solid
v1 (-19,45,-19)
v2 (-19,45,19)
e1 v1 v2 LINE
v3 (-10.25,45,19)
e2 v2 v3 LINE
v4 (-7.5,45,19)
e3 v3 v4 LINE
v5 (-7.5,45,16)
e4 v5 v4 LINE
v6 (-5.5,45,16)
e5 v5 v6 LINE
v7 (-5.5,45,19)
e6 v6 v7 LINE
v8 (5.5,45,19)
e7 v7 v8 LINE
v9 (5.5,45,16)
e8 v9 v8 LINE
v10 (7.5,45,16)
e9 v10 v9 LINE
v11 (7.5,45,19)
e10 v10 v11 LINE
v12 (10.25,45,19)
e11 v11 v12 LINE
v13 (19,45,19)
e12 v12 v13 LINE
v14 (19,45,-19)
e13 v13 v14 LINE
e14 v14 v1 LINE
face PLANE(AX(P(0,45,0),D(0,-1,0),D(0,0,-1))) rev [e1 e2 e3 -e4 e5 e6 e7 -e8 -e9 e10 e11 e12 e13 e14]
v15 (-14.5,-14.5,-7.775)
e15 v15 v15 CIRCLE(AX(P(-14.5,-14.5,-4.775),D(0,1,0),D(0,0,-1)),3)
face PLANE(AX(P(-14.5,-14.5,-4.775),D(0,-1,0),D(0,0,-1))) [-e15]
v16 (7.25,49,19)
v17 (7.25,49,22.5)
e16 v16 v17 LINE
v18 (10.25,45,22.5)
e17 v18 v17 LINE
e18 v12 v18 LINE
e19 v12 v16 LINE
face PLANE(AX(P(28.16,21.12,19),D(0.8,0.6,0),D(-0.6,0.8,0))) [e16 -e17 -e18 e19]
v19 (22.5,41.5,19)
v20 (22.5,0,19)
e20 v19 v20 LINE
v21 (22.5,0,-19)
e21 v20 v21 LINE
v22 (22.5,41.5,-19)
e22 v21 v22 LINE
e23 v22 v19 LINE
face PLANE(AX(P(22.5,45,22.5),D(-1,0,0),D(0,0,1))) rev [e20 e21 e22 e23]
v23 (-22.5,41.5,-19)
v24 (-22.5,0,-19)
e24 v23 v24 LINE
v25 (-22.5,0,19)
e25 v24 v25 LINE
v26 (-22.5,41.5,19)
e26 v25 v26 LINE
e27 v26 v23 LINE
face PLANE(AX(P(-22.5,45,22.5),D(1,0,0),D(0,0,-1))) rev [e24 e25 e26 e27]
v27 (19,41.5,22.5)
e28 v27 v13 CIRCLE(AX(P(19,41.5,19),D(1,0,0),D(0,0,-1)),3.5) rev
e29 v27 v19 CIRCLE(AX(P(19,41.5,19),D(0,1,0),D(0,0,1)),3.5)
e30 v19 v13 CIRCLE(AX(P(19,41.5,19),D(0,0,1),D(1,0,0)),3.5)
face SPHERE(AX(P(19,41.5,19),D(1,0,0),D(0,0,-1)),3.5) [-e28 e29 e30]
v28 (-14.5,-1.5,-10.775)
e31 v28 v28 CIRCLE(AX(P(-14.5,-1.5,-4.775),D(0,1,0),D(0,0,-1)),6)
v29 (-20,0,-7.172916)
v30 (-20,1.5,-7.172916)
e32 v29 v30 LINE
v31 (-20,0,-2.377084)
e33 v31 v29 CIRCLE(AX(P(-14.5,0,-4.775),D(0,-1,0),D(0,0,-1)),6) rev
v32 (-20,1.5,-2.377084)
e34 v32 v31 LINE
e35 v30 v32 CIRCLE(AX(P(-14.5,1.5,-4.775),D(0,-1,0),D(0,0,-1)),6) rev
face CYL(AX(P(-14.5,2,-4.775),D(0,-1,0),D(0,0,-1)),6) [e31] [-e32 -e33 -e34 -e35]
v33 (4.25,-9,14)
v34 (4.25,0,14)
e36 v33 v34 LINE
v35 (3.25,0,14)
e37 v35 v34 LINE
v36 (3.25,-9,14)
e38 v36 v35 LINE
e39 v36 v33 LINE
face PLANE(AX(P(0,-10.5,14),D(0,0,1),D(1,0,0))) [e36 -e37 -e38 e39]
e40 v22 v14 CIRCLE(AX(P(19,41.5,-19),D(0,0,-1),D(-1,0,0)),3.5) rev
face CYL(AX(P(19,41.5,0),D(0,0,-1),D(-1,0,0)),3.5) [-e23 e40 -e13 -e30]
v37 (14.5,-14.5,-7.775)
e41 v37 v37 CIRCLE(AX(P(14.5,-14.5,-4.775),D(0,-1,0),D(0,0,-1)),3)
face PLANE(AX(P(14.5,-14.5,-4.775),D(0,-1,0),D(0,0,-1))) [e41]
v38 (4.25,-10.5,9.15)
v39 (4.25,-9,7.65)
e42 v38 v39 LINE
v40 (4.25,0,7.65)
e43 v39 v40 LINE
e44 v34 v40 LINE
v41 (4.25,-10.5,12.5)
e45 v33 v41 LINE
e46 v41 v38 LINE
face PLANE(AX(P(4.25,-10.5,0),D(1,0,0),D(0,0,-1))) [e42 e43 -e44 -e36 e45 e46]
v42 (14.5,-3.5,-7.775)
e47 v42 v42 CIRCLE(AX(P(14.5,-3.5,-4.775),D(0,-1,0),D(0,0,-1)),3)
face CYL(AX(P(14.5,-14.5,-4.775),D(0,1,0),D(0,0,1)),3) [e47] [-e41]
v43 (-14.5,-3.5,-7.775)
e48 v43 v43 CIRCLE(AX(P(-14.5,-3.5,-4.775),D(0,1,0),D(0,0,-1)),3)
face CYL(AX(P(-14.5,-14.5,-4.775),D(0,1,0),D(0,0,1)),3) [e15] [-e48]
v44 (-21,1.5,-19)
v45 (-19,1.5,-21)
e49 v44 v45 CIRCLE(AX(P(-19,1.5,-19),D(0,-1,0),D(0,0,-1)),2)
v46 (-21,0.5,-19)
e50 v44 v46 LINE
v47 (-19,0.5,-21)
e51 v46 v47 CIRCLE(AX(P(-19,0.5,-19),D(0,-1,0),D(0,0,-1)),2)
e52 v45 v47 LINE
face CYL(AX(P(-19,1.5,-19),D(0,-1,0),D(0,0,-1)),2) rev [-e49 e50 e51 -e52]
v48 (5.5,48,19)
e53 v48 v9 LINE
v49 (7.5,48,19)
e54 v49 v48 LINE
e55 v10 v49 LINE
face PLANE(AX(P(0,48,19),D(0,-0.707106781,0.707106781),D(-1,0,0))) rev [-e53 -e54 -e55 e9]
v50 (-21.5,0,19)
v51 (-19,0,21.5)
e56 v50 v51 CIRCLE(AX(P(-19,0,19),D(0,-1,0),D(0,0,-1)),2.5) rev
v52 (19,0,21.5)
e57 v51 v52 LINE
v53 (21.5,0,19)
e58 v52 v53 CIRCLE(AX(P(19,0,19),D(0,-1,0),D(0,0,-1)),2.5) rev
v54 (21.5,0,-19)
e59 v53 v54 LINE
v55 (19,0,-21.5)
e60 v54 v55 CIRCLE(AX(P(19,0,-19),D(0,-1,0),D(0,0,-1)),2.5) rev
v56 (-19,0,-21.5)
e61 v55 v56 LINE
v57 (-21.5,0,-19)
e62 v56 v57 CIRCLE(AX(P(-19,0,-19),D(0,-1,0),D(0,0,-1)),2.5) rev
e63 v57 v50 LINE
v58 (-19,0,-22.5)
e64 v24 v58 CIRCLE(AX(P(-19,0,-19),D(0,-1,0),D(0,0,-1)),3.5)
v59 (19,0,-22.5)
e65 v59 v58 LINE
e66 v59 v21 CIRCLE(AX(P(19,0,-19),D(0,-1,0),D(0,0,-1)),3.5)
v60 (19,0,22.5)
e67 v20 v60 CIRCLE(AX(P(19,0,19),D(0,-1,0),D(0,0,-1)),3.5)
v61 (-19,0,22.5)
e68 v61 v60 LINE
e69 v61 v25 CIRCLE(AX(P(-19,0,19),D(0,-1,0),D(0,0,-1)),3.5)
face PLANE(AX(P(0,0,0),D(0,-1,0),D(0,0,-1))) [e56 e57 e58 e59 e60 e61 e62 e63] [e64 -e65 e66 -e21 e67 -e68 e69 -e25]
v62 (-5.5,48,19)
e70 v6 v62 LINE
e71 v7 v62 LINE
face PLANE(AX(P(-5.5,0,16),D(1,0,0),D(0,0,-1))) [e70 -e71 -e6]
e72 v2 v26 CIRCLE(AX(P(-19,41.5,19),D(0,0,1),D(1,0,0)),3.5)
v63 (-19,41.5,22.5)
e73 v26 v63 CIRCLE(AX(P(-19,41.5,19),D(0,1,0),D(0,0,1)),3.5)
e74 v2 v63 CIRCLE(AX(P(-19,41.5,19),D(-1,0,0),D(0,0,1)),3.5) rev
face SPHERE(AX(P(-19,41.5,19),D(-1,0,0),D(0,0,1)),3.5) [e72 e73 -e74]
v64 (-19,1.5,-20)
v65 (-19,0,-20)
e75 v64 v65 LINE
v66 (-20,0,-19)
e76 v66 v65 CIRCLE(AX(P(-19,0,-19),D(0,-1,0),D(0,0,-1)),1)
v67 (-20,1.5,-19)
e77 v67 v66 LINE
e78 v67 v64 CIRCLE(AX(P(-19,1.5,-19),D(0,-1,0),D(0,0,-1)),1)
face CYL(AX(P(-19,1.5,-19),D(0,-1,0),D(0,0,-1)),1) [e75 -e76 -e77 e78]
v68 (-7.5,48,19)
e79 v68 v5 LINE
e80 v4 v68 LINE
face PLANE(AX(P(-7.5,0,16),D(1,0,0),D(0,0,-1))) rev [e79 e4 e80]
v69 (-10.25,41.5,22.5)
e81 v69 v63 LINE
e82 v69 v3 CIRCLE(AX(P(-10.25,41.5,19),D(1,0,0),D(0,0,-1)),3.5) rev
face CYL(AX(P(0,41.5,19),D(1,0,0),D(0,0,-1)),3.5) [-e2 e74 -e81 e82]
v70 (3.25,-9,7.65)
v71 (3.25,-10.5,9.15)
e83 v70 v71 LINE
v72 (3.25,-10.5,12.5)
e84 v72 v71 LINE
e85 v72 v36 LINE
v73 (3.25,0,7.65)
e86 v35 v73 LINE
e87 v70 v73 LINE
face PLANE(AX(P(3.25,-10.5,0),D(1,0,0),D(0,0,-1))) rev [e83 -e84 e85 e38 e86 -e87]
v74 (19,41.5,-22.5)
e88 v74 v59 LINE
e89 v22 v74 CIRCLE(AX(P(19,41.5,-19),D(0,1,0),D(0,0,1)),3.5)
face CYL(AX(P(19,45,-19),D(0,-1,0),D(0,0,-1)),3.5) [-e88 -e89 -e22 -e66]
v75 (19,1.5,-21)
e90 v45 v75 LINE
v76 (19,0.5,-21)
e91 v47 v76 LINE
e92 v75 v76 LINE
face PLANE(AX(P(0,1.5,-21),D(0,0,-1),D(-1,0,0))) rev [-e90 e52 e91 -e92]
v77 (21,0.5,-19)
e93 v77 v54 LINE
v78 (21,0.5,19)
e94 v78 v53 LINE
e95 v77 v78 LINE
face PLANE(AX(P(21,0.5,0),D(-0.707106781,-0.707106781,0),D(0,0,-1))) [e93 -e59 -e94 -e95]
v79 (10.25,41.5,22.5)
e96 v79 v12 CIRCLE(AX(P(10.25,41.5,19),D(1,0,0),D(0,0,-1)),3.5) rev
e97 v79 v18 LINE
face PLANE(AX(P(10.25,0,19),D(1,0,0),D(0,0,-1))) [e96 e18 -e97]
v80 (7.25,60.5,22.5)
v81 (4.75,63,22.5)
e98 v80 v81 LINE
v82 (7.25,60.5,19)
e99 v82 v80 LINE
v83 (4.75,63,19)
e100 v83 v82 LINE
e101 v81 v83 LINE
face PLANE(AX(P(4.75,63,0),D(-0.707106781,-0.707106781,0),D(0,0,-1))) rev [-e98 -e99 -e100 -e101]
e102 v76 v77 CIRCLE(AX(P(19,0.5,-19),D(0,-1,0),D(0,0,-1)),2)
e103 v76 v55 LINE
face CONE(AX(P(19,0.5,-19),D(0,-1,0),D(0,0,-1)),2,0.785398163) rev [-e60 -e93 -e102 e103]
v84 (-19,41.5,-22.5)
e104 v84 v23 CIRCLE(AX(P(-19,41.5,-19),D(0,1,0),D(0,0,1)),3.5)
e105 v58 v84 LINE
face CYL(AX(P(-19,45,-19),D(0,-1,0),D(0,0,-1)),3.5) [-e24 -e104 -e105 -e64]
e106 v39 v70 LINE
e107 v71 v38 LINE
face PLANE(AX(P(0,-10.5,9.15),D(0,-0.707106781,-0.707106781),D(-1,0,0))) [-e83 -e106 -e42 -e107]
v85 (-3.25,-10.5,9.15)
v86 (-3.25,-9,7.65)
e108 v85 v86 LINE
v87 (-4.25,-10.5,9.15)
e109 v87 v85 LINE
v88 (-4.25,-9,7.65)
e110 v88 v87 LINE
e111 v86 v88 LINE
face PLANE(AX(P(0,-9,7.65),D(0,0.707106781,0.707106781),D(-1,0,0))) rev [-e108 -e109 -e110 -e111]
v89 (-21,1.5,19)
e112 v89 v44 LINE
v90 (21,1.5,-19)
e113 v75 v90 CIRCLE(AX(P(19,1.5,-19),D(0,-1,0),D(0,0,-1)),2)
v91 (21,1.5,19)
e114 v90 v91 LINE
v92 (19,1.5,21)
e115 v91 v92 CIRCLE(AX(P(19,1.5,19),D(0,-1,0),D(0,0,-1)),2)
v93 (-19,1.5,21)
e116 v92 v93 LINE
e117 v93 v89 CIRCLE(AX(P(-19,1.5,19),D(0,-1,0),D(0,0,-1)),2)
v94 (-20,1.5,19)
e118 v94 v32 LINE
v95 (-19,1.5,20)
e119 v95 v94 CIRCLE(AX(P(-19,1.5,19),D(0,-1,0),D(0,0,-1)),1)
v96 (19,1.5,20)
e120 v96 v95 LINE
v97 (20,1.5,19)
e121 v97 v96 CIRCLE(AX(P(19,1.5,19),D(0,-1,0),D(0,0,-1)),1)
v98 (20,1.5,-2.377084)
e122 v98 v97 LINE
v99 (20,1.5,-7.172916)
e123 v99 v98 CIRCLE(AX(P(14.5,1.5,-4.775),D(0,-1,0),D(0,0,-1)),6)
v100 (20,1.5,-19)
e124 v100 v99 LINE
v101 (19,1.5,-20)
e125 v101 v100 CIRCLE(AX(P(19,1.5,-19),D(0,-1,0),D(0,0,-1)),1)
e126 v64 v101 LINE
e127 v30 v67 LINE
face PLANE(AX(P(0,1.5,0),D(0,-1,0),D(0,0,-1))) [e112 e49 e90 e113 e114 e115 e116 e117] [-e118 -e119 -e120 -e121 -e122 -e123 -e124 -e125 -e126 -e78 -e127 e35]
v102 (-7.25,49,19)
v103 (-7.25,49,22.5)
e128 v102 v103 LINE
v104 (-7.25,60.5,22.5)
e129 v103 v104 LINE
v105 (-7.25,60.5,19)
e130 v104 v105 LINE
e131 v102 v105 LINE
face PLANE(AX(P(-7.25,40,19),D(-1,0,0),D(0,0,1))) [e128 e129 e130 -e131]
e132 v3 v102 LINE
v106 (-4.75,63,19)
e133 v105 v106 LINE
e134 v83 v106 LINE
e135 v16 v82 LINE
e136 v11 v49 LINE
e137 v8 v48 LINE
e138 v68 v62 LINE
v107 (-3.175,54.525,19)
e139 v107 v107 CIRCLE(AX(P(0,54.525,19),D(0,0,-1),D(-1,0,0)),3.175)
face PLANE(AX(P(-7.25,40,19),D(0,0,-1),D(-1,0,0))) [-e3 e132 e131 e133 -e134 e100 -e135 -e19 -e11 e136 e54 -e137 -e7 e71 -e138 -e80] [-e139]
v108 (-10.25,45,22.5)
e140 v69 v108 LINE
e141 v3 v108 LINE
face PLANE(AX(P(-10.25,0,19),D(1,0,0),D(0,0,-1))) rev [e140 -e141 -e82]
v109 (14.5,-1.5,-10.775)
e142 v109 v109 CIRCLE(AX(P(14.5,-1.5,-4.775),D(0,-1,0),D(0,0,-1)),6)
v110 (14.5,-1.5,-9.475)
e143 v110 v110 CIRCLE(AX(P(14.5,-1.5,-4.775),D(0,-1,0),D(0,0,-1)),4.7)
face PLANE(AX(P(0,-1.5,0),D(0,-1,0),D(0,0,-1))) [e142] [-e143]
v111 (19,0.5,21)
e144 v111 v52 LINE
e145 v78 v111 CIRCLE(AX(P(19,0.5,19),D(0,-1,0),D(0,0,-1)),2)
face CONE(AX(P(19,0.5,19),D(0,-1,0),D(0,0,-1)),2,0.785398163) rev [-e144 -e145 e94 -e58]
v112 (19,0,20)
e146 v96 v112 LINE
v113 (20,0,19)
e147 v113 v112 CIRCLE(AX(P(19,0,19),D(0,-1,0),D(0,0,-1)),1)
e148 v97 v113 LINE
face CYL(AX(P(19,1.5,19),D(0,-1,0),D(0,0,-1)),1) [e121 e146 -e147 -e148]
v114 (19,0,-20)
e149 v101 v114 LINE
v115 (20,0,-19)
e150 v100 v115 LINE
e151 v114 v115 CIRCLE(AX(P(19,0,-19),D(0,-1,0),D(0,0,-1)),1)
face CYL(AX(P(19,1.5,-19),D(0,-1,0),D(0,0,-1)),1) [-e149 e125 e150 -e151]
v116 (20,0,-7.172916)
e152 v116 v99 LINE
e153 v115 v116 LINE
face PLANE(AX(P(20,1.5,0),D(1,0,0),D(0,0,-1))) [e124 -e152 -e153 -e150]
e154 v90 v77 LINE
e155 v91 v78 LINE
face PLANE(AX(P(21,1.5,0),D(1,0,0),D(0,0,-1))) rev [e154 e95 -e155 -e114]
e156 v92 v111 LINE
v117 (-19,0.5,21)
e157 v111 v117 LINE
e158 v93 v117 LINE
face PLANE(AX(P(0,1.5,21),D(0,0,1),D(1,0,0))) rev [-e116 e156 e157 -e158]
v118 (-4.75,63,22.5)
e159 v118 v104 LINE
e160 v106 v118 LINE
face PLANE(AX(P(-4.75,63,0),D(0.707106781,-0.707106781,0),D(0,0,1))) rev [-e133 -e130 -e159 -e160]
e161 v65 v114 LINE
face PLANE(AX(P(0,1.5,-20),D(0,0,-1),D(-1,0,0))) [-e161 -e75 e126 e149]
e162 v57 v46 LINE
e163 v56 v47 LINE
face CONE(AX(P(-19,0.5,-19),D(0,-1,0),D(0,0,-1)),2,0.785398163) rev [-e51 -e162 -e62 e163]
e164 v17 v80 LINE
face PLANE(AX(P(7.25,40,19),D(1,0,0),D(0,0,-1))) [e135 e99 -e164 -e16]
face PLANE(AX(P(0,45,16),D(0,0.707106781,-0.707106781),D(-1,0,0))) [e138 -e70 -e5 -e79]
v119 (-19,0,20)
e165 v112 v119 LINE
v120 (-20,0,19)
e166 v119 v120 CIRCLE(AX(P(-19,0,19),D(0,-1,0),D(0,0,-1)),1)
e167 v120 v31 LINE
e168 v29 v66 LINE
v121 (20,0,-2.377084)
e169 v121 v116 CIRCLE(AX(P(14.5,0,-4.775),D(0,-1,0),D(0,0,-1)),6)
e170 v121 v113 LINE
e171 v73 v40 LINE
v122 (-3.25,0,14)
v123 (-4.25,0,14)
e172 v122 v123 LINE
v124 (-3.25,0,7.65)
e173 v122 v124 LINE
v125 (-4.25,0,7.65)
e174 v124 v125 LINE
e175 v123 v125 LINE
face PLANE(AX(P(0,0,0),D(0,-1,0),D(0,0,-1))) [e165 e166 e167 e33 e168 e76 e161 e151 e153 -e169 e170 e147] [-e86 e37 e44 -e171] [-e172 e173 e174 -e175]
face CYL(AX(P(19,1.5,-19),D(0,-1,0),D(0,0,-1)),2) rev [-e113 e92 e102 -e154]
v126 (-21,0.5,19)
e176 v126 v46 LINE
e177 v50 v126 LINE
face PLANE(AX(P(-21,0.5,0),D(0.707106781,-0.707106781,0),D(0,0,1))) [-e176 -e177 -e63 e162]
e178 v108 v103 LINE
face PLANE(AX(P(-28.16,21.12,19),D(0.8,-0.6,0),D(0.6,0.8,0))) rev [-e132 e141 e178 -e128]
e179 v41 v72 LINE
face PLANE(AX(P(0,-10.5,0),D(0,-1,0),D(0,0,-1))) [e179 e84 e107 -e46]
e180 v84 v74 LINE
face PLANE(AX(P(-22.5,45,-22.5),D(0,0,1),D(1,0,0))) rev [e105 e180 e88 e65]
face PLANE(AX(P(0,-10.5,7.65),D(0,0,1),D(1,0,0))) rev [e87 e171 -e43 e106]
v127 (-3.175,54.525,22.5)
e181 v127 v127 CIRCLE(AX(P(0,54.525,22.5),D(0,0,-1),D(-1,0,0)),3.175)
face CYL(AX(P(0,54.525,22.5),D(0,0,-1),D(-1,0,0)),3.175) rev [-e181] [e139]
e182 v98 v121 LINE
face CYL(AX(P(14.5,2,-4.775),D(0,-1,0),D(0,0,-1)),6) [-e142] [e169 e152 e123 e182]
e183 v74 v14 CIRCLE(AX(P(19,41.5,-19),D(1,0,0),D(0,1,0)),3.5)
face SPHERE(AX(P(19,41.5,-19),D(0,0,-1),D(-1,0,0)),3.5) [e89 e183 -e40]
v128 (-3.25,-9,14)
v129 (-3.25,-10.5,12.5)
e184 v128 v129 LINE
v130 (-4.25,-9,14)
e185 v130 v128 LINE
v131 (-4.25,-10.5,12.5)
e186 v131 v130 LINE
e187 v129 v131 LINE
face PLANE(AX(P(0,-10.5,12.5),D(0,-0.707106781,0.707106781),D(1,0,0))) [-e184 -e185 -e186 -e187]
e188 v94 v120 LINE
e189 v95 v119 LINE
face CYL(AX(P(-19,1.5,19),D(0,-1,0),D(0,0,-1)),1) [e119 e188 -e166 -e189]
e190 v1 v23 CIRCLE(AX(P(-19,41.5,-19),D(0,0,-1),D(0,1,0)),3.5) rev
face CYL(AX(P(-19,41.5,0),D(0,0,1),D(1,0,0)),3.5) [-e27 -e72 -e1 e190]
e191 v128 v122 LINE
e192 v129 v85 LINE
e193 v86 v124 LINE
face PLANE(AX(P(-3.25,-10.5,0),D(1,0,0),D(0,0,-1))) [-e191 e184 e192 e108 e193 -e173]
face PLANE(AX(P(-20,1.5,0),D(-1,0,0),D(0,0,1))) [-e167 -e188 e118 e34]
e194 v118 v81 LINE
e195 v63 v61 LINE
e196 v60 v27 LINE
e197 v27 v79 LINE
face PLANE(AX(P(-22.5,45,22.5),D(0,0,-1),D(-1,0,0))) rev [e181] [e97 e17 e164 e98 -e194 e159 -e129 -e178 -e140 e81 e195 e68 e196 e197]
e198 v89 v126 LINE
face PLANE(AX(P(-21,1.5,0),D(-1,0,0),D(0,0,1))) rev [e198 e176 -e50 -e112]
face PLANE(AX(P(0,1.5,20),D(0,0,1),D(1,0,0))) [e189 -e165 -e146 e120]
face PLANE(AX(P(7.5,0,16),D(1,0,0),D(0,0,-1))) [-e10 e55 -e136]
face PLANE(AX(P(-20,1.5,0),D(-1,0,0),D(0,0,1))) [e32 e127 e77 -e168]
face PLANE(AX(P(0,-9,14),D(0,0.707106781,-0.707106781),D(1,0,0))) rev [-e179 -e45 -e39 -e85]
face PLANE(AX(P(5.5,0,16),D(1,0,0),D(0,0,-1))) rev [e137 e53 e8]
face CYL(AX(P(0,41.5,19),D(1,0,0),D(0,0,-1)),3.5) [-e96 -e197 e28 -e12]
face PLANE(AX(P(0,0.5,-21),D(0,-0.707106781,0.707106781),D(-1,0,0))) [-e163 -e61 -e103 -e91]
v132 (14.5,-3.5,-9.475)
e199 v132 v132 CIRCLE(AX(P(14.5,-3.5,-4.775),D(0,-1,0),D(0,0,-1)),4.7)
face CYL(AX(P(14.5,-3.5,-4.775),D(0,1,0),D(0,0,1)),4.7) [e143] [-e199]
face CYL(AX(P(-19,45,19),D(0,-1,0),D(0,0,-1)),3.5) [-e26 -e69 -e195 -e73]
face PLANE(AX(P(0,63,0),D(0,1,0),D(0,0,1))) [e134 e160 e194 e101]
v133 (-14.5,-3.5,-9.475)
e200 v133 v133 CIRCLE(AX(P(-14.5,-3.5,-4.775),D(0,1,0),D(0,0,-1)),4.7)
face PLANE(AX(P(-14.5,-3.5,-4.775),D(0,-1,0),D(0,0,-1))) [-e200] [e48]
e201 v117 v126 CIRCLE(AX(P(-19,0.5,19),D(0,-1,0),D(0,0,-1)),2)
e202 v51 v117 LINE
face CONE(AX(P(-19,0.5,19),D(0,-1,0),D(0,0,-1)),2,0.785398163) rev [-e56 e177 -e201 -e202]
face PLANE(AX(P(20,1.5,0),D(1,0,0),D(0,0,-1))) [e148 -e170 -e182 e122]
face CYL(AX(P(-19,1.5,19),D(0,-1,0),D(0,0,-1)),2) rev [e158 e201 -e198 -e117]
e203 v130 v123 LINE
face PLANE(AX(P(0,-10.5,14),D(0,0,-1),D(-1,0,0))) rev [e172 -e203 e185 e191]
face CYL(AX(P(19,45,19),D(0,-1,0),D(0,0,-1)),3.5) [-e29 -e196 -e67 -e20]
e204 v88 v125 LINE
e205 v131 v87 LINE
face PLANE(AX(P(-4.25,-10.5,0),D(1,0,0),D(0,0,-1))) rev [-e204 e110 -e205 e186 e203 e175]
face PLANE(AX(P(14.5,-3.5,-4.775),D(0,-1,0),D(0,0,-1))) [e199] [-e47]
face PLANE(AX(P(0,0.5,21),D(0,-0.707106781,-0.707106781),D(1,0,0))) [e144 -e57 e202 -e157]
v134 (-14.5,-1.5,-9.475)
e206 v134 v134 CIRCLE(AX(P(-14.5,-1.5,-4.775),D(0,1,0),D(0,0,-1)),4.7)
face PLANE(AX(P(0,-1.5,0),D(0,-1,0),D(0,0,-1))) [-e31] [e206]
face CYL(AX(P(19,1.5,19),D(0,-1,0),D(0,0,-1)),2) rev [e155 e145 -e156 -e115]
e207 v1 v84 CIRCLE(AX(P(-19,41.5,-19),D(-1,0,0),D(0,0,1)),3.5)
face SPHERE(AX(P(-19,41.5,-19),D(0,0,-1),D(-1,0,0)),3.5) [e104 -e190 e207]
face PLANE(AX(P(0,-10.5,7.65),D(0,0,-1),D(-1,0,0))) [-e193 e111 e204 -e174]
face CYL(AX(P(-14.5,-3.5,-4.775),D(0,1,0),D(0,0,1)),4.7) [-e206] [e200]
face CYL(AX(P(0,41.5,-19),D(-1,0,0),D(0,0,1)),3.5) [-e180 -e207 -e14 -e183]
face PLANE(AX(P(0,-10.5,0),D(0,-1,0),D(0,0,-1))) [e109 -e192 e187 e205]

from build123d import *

# Parameters (mm, degrees)
SKETCH_1_W                 = 45
SKETCH_1_H                 = 45
EXTRUDE_1_DEPTH            = 45
FILLET_1_R                 = 3.5
EXTRUDE_2_DEPTH            = 18
EXTRUDE_2_DEPTH_BACK       = 5
SKETCH_2_W                 = 14.5
SKETCH_2_H                 = 3.5
SKETCH_4_W                 = 3
SKETCH_4_H                 = 3.5
EXTRUDE_3_DEPTH            = 3.5
CHAMFER_1_SIZE             = 2.5
SKETCH_5_R                 = 3.175
CUT_EXTRUDE_1_DEPTH        = 3.5
SKETCH_6_W                 = 2
SKETCH_6_H                 = 3
EXTRUDE_4_DEPTH            = 3
CHAMFER_2_SIZE             = 3
CHAMFER_2_OF_MIRROR_2_SIZE = 3
CUT_EXTRUDE_2_DEPTH        = 1.5
CHAMFER_3_SIZE             = 0.5
SKETCH_8_W                 = 1
SKETCH_8_H                 = 6.35
EXTRUDE_5_DEPTH            = 10.5
EXTRUDE_START              = -2
EXTRUDE_6_DEPTH            = 3.5
SKETCH_10_R                = 4.7
EXTRUDE_7_DEPTH            = 2
SKETCH_11_R                = 3
EXTRUDE_8_DEPTH            = 11
CHAMFER_4_SIZE             = 1.5


with BuildPart() as part:
    # ｽｹｯﾁ1 → ﾎﾞｽ - 押し出し1 (new body)
    with BuildSketch(Plane(origin=(0, 0, 0), x_dir=(1, 0, 0), z_dir=(0, 1, 0))):
        Rectangle(SKETCH_1_W, SKETCH_1_H)
    extrude(amount=EXTRUDE_1_DEPTH)

    # ﾌｨﾚｯﾄ1
    fillet_1_edges = [part.edges().sort_by_distance(p)[0] for p in [
        (-22.5, 45, 0),
        (0, 45, 22.5),
        (22.5, 45, 0),
        (22.5, 22.5, 22.5),
        (-22.5, 22.5, 22.5),
        (-22.5, 22.5, -22.5),
        (22.5, 22.5, -22.5),
        (0, 45, -22.5),
    ]]
    fillet(fillet_1_edges, radius=FILLET_1_R)

    # ｽｹｯﾁ2 → ﾎﾞｽ - 押し出し2 (add, two sides: drawn at the far end of the back side and taken through both)
    with BuildSketch(Plane(origin=(0, 45, 0), x_dir=(1, 0, 0), z_dir=(0, 1, 0)).offset(-EXTRUDE_2_DEPTH_BACK)):
        with Locations((0, -20.75)):
            Rectangle(SKETCH_2_W, SKETCH_2_H)
    extrude(amount=EXTRUDE_2_DEPTH + EXTRUDE_2_DEPTH_BACK)

    # ｽｹｯﾁ4 → ﾎﾞｽ - 押し出し3 (add)
    with BuildSketch(Plane.XY.offset(22.5)):
        Polygon((-7.25, 45), (-7.25, 49), (-10.25, 45), align=None)
        with Locations((-8.75, 43.25)):
            Rectangle(SKETCH_4_W, SKETCH_4_H)
    extrude_3 = extrude(amount=-EXTRUDE_3_DEPTH)

    # ﾐﾗｰ1: ﾎﾞｽ - 押し出し3 across plane
    add(extrude_3.mirror(Plane(origin=(0, 0, 0), x_dir=(0, 0, 1), z_dir=(1, 0, 0))))

    # 面取り1
    chamfer_1_edges = [part.edges().sort_by_distance(p)[0] for p in [
        (-7.25, 63, 20.75),
        (7.25, 63, 20.75),
    ]]
    chamfer(chamfer_1_edges, length=CHAMFER_1_SIZE)

    # ｽｹｯﾁ5 → ｶｯﾄ - 押し出し1 (cut)
    with BuildSketch(Plane(origin=(0, 0, 19), x_dir=(-1, 0, 0), z_dir=(0, 0, -1))):
        with Locations((0, 54.525)):
            Circle(SKETCH_5_R)
    extrude(amount=-CUT_EXTRUDE_1_DEPTH, mode=Mode.SUBTRACT)

    # ｽｹｯﾁ6 → ﾎﾞｽ - 押し出し4 (add)
    with BuildSketch(Plane(origin=(0, 0, 19), x_dir=(-1, 0, 0), z_dir=(0, 0, -1))):
        with Locations((-6.5, 46.5)):
            Rectangle(SKETCH_6_W, SKETCH_6_H)
    extrude_4 = extrude(amount=EXTRUDE_4_DEPTH)

    # 面取り2
    chamfer_2_edges = [part.edges().sort_by_distance(p)[0] for p in [
        (6.5, 48, 16),
    ]]
    chamfer(chamfer_2_edges, length=CHAMFER_2_SIZE - 0.0001)  # a hair under: the kernel refuses the full size

    # ﾐﾗｰ2: ﾎﾞｽ - 押し出し4 across plane
    add(extrude_4.mirror(Plane(origin=(0, 0, 0), x_dir=(0, 0, 1), z_dir=(1, 0, 0))))

    # 面取り2 of ﾐﾗｰ2
    chamfer_2_of_mirror_2_edges = [part.edges().sort_by_distance(p)[0] for p in [
        (-6.5, 48, 16),
    ]]
    chamfer(chamfer_2_of_mirror_2_edges, length=CHAMFER_2_OF_MIRROR_2_SIZE - 0.0001)  # a hair under: the kernel refuses the full size

    # ｽｹｯﾁ7 → ｶｯﾄ - 押し出し2 (cut)
    with BuildSketch(Plane.XZ):
        with BuildLine():
            Line((21, -19), (21, 19))
            ThreePointArc((21, 19), (20.414213562, 20.414213562), (19, 21))
            Line((19, 21), (-19, 21))
            ThreePointArc((-19, 21), (-20.414213562, 20.414213562), (-21, 19))
            Line((-21, 19), (-21, -19))
            ThreePointArc((-21, -19), (-20.414213562, -20.414213562), (-19, -21))
            Line((-19, -21), (19, -21))
            ThreePointArc((19, -21), (20.414213562, -20.414213562), (21, -19))
        make_face()
        with BuildLine():
            ThreePointArc((20, 19), (19.707106781, 19.707106781), (19, 20))
            Line((19, 20), (-19, 20))
            ThreePointArc((-19, 20), (-19.707106781, 19.707106781), (-20, 19))
            Line((-20, 19), (-20, -19))
            ThreePointArc((-20, -19), (-19.707106781, -19.707106781), (-19, -20))
            Line((-19, -20), (19, -20))
            ThreePointArc((19, -20), (19.707106781, -19.707106781), (20, -19))
            Line((20, -19), (20, 19))
        make_face(mode=Mode.SUBTRACT)
    extrude(amount=-CUT_EXTRUDE_2_DEPTH, mode=Mode.SUBTRACT)

    # 面取り3
    chamfer_3_edges = [part.edges().sort_by_distance(p)[0] for p in [
        (21, 0, 0),
        (20.414213562, 0, 20.414213562),
        (0, 0, 21),
        (-20.414213562, 0, 20.414213562),
        (-21, 0, 0),
        (-20.414213562, 0, -20.414213562),
        (0, 0, -21),
        (20.414213562, 0, -20.414213562),
    ]]
    chamfer(chamfer_3_edges, length=CHAMFER_3_SIZE)

    # ｽｹｯﾁ8 → ﾎﾞｽ - 押し出し5 (add)
    with BuildSketch(Plane.XZ):
        with Locations((3.75, 10.825)):
            Rectangle(SKETCH_8_W, SKETCH_8_H)
    extrude_5 = extrude(amount=EXTRUDE_5_DEPTH)

    # ｽｹｯﾁ9 → ﾎﾞｽ - 押し出し6 (add)
    with BuildSketch(Plane.XZ.offset(EXTRUDE_START)):
        with BuildLine():
            ThreePointArc((20, -7.172915762), (20.373670062, -5.999744871), (20.5, -4.775))
            ThreePointArc((20.5, -4.775), (20.373670062, -3.550255129), (20, -2.377084238))
            Line((20, -2.377084238), (20, -7.172915762))
        make_face()
        with BuildLine():
            Line((20, -7.172915762), (20, -2.377084238))
            ThreePointArc((20, -2.377084238), (8.5, -4.775), (20, -7.172915762))
        make_face()
    extrude_6 = extrude(amount=EXTRUDE_6_DEPTH)

    # ｽｹｯﾁ10 → ﾎﾞｽ - 押し出し7 (add)
    with BuildSketch(Plane.XZ.offset(1.5)):
        with Locations(Location((14.5, -4.775, 0), (0, 0, 270))):
            Circle(SKETCH_10_R)
    extrude_7 = extrude(amount=EXTRUDE_7_DEPTH)

    # ｽｹｯﾁ11 → ﾎﾞｽ - 押し出し8 (add)
    with BuildSketch(Plane.XZ.offset(3.5)):
        with Locations(Location((14.5, -4.775, 0), (0, 0, 270))):
            Circle(SKETCH_11_R)
    extrude_8 = extrude(amount=EXTRUDE_8_DEPTH)

    # ﾐﾗｰ3: ﾎﾞｽ - 押し出し5, ﾎﾞｽ - 押し出し6, ﾎﾞｽ - 押し出し7, ﾎﾞｽ - 押し出し8 across plane
    add(extrude_5.mirror(Plane(origin=(0, 0, 0), x_dir=(0, 0, 1), z_dir=(1, 0, 0))))
    add(extrude_6.mirror(Plane(origin=(0, 0, 0), x_dir=(0, 0, 1), z_dir=(1, 0, 0))))
    add(extrude_7.mirror(Plane(origin=(0, 0, 0), x_dir=(0, 0, 1), z_dir=(1, 0, 0))))
    add(extrude_8.mirror(Plane(origin=(0, 0, 0), x_dir=(0, 0, 1), z_dir=(1, 0, 0))))

    # 面取り4
    chamfer_4_edges = [part.edges().sort_by_distance(p)[0] for p in [
        (3.75, -10.5, 14),
        (3.75, -10.5, 7.65),
        (-3.75, -10.5, 7.65),
        (-3.75, -10.5, 14),
    ]]
    chamfer(chamfer_4_edges, length=CHAMFER_4_SIZE)


solid = part.part
